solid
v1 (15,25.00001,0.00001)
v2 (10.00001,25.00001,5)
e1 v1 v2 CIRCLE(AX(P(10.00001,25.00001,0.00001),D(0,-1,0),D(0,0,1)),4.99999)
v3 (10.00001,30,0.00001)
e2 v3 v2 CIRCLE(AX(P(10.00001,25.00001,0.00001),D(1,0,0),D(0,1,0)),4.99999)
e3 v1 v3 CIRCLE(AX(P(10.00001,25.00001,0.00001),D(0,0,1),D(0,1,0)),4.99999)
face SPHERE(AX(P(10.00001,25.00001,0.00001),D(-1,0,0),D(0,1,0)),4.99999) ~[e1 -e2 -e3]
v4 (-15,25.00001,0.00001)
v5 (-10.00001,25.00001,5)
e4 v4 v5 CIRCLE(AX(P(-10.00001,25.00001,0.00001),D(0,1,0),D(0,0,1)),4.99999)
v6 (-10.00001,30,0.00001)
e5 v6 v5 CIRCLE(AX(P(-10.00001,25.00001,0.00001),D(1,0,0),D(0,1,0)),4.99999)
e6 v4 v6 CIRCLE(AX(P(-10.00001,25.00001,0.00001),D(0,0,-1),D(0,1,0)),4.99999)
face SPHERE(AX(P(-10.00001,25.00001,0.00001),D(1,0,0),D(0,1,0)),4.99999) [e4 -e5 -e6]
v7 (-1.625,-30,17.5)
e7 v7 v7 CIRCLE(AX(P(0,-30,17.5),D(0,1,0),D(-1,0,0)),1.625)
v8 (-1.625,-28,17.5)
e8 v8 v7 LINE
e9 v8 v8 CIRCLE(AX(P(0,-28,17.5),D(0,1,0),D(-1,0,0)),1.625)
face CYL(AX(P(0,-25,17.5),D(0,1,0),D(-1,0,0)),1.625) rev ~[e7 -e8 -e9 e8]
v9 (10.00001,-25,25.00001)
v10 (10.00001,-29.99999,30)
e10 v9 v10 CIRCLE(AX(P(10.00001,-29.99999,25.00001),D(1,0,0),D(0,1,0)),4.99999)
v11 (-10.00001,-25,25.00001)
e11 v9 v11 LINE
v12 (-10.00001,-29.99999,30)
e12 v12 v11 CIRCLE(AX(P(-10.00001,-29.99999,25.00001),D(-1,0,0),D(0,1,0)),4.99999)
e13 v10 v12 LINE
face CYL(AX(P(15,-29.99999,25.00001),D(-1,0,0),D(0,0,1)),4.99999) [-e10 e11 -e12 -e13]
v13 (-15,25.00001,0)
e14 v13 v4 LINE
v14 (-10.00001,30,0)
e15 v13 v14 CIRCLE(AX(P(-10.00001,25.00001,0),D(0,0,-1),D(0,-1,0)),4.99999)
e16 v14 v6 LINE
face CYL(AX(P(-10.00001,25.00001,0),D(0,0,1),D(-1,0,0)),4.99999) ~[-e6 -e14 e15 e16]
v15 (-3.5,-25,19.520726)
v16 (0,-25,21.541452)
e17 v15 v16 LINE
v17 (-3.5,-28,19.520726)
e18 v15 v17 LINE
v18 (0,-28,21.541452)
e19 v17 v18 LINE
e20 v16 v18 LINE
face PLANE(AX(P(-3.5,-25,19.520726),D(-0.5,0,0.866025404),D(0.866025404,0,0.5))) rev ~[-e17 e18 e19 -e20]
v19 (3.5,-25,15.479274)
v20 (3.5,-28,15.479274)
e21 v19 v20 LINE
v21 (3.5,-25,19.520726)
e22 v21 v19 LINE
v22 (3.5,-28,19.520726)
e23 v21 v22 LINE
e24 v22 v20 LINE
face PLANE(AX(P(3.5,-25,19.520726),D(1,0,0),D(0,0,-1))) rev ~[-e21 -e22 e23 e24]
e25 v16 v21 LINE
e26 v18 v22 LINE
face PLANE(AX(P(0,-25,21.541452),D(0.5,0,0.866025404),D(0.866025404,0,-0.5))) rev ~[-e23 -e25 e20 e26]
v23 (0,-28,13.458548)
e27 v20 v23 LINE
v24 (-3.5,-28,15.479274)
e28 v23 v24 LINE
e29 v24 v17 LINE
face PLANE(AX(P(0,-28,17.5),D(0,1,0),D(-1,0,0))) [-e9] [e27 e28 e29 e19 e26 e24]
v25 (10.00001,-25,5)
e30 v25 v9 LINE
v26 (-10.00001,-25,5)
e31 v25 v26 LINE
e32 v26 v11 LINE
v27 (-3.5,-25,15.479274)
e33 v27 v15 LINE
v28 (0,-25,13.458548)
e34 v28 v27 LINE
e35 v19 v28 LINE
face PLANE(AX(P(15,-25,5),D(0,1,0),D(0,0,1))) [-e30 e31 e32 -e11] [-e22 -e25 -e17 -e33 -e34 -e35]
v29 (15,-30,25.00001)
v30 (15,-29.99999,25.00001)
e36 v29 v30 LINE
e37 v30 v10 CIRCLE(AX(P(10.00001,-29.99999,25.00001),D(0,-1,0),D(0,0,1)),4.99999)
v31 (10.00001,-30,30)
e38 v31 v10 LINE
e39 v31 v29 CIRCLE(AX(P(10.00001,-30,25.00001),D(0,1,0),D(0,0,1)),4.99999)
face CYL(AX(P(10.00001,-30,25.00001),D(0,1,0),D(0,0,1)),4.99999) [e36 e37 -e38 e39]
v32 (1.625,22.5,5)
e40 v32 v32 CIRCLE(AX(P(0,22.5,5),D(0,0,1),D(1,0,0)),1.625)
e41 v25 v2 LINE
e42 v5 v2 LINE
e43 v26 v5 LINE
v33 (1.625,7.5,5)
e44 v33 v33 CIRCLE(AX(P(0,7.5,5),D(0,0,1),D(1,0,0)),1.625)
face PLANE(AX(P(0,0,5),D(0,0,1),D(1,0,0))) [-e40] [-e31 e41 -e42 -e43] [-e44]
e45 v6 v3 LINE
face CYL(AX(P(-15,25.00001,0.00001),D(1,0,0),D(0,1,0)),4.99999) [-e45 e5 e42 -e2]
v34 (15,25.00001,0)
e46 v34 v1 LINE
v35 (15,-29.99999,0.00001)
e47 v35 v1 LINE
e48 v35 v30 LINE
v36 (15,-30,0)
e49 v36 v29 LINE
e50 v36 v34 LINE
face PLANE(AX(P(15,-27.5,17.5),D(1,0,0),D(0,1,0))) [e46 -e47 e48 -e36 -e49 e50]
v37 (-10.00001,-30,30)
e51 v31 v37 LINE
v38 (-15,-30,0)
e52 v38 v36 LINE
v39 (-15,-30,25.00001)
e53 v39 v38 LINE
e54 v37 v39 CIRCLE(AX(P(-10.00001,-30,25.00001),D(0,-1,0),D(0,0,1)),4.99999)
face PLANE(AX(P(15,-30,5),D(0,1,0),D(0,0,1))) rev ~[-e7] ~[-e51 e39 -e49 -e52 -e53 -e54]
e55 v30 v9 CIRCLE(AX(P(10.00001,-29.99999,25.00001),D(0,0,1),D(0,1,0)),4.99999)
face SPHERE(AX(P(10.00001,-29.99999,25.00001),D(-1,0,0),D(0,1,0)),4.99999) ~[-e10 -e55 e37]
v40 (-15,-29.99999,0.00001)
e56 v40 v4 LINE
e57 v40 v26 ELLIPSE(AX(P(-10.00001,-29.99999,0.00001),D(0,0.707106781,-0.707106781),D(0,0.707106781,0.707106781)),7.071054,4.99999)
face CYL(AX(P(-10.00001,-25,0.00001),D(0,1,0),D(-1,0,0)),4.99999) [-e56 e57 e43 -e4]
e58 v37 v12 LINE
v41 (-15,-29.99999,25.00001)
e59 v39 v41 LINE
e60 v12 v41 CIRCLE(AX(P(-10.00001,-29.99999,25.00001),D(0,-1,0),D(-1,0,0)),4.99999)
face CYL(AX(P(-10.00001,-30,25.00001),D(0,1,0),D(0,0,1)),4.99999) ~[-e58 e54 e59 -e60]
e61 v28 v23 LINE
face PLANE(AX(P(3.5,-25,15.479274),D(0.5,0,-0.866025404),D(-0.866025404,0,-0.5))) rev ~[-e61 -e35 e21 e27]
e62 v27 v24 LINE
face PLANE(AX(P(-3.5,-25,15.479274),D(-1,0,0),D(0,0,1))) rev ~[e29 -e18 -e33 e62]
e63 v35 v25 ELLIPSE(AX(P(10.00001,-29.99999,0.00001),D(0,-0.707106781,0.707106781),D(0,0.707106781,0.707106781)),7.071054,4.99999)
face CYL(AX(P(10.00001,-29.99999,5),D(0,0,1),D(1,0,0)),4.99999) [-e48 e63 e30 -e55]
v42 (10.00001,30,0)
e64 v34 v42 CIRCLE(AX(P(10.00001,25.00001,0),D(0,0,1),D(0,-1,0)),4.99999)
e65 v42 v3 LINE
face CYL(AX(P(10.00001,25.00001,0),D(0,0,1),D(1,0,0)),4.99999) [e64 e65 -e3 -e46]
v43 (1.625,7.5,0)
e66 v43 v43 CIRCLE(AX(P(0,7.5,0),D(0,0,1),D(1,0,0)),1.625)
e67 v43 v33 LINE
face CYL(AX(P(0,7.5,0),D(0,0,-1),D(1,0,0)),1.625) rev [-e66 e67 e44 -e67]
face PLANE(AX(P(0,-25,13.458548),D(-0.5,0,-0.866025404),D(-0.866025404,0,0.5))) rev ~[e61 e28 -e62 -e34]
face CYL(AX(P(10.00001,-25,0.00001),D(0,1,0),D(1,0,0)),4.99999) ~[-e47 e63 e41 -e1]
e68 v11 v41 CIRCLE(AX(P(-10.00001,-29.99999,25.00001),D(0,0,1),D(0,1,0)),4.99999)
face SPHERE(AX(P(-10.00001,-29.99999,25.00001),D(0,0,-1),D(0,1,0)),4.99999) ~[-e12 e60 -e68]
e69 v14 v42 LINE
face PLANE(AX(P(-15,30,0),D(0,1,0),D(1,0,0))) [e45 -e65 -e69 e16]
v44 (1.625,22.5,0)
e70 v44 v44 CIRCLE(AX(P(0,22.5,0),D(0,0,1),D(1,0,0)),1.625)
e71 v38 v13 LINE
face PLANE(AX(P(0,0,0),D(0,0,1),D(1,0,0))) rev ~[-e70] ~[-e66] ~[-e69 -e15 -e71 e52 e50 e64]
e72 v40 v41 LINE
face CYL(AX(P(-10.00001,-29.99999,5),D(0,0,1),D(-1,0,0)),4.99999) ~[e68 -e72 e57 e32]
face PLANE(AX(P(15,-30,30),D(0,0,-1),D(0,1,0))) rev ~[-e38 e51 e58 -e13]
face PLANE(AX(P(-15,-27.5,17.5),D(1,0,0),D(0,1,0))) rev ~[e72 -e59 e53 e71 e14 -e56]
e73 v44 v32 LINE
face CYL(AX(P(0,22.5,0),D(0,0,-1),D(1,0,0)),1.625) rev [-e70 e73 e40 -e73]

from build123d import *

# Parameters (mm, degrees)
F0_W     = 30
F0_H     = 60
F0_R     = 1.625
F1_DEPTH = 5
F2_W     = 5
F2_H     = 25
F3_DEPTH = 30
F4_R     = 1.625
F5_DEPTH = 25
F6_R     = 1.625
F7_DEPTH = 3
F8_R     = 4.99999


# Not quite as in the source:
# - a fillet or chamfer is up to 0.001 mm smaller than in the source, because OpenCascade refuses the exact size


with BuildPart() as f1:
    # F0 (on Top) → F1 (new body)
    with BuildSketch(Plane.XY):
        Rectangle(F0_W, F0_H)
        with Locations((0, 7.5)):
            Circle(F0_R, mode=Mode.SUBTRACT)
        with Locations((0, 22.5)):
            Circle(F0_R, mode=Mode.SUBTRACT)
    extrude(amount=F1_DEPTH)

    # F2 (on face) → F3 (join)
    with BuildSketch(Plane.YZ.offset(15)):
        with Locations((-27.5, 17.5)):
            Rectangle(F2_W, F2_H)
    extrude(amount=-F3_DEPTH)

    # F4 (on face) → F5 (cut)
    with BuildSketch(Plane(origin=(0, -25, 0), x_dir=(-1, 0, 0), z_dir=(0, 1, 0))):
        with Locations((0, 17.5)):
            Circle(F4_R)
    extrude(amount=-F5_DEPTH, mode=Mode.SUBTRACT)

    # F6 (on face) → F7 (cut)
    with BuildSketch(Plane(origin=(0, -25, 0), x_dir=(-1, 0, 0), z_dir=(0, 1, 0))):
        Polygon((3.5, 15.4792740578), (3.5, 19.5207259422), (0, 21.5414518843), (-3.5, 19.5207259422), (-3.5, 15.4792740578), (0, 13.4585481157), align=None)
        with Locations((0, 17.5)):
            Circle(F6_R, mode=Mode.SUBTRACT)
    extrude(amount=-F7_DEPTH, mode=Mode.SUBTRACT)

    # F8 (radius 5 in the source; OpenCascade refuses exactly that, so slightly less here)
    f8_edges = [f1.edges().sort_by_distance(p)[0] for p in [
        (0, 30, 5),
        (15, 30, 2.5),
        (-15, 30, 2.5),
        (15, 2.5, 5),
        (-15, 2.5, 5),
        (-15, -25, 17.5),
        (0, -25, 30),
        (15, -25, 17.5),
        (-15, -27.5, 30),
        (15, -27.5, 30),
    ]]
    fillet(f8_edges, radius=F8_R)


solid = f1.part
